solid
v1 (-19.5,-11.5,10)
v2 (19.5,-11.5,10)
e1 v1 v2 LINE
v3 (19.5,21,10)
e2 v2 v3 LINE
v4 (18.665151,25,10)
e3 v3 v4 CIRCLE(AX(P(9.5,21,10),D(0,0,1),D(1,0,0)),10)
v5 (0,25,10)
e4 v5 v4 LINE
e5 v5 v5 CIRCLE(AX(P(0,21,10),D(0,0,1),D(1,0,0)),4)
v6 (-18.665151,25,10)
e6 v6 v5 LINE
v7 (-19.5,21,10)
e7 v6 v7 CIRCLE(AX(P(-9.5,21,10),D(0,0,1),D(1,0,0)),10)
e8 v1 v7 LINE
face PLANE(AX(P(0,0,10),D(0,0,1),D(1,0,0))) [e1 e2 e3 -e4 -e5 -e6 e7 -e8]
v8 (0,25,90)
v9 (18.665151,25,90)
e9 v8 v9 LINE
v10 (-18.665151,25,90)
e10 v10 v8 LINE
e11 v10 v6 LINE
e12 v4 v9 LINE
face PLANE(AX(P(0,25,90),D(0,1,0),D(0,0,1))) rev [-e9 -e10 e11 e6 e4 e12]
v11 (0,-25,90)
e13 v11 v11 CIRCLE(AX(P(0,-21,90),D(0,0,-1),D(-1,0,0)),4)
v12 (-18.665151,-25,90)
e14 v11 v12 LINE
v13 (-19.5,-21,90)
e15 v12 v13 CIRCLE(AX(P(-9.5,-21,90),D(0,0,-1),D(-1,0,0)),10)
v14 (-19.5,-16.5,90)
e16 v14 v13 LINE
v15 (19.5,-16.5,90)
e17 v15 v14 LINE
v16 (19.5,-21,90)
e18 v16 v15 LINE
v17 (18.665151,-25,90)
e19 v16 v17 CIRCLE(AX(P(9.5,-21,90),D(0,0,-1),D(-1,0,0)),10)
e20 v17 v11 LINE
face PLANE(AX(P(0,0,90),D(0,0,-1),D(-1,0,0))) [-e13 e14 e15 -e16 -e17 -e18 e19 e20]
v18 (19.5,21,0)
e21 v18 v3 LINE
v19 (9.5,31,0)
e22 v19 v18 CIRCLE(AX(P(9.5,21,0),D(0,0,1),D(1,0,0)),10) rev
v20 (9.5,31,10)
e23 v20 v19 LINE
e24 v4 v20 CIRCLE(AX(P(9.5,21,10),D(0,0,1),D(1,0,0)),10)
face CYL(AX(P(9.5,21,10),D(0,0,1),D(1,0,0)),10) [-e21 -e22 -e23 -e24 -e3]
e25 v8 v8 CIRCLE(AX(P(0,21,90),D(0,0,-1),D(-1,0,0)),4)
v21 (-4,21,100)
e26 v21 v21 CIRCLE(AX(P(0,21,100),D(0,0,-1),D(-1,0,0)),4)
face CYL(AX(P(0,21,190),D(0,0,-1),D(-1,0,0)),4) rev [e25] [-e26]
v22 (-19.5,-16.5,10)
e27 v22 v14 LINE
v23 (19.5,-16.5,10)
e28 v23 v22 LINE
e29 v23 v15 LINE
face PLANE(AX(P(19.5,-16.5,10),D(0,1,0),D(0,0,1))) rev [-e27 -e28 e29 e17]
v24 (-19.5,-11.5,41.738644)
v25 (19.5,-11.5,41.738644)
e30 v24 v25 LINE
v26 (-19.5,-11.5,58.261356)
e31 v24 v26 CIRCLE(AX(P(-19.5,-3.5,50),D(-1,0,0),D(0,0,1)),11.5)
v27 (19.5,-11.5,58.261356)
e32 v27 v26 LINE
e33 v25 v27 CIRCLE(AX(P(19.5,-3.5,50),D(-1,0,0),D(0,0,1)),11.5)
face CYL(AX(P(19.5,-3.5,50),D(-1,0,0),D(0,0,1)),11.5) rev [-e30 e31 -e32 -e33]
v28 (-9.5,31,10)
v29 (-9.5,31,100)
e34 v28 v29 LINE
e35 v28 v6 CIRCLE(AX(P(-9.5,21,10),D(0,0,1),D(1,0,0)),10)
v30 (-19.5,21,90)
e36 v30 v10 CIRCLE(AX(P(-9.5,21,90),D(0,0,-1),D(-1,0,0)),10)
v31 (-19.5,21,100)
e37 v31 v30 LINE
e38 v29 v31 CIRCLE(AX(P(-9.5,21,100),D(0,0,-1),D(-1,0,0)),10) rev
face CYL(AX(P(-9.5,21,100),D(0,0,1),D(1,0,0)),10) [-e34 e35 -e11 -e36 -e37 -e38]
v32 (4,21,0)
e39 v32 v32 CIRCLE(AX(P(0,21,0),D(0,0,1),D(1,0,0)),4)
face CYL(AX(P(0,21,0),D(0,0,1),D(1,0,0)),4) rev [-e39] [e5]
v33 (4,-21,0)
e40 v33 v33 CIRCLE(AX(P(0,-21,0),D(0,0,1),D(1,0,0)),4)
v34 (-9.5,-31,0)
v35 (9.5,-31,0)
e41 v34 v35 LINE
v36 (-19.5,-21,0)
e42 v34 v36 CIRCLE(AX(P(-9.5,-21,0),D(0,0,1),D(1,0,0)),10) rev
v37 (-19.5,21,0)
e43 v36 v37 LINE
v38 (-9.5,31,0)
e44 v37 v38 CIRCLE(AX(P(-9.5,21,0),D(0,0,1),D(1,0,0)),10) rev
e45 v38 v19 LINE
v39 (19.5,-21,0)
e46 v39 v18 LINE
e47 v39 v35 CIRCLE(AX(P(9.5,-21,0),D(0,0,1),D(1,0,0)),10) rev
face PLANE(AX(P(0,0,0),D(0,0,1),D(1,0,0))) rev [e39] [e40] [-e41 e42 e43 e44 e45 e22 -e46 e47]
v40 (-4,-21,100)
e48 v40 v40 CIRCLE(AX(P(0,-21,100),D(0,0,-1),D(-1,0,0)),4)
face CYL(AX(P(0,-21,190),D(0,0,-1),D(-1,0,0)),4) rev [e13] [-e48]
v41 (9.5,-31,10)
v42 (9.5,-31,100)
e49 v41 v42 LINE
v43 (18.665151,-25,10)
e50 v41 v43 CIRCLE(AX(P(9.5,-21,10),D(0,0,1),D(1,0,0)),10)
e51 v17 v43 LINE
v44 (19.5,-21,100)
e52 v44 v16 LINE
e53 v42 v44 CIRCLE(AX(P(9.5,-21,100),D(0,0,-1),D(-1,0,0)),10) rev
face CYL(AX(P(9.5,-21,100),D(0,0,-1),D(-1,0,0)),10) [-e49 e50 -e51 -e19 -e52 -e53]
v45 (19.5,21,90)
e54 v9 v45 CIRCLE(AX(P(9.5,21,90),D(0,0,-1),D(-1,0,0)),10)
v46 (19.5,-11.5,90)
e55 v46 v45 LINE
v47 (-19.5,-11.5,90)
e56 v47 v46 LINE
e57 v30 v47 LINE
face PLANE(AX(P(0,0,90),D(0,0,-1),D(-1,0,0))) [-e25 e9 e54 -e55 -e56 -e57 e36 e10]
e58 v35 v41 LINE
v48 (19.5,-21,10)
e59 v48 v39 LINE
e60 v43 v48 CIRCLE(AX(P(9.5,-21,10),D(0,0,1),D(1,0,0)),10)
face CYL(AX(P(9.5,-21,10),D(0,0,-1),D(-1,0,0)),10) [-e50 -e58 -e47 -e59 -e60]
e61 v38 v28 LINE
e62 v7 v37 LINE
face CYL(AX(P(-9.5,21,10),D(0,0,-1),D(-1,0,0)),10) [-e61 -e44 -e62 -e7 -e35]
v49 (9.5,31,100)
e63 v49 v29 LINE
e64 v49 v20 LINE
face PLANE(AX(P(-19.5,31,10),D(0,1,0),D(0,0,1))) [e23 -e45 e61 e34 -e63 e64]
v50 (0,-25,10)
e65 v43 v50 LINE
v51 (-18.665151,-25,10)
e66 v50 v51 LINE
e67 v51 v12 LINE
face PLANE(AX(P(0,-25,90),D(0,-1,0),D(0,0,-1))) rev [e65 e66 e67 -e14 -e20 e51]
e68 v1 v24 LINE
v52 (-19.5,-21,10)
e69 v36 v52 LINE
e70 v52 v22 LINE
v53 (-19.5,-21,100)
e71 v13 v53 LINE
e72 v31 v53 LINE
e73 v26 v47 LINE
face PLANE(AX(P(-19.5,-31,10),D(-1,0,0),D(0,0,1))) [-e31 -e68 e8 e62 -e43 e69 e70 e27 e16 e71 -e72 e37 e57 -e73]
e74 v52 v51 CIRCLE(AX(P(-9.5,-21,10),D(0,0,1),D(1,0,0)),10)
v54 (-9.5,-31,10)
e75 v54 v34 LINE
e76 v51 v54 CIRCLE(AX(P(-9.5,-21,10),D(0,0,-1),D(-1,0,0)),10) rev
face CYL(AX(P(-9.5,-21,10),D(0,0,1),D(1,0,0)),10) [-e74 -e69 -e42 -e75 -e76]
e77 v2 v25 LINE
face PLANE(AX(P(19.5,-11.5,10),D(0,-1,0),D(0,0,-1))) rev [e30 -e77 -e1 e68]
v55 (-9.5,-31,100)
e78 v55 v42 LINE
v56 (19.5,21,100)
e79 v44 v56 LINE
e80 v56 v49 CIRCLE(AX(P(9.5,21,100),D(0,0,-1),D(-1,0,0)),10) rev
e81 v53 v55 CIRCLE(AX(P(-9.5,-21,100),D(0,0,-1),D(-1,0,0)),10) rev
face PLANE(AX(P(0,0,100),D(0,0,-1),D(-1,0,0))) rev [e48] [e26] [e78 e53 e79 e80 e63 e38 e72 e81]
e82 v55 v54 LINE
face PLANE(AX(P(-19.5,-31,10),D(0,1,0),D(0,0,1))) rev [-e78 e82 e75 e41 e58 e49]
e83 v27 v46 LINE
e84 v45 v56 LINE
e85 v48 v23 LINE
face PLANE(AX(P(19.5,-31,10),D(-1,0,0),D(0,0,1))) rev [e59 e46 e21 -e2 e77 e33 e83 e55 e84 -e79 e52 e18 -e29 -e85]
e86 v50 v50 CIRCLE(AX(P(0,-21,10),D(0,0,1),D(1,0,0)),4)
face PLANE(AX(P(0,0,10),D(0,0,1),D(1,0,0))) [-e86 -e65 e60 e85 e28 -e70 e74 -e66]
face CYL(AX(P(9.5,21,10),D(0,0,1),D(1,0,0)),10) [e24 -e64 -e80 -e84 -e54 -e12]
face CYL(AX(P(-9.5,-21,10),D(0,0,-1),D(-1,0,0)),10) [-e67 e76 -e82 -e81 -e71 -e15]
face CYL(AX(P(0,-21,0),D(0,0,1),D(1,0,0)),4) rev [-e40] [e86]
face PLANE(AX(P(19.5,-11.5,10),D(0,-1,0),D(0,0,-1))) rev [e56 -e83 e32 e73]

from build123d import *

# Parameters (mm, degrees)
ESQUISSE1_W             = 39
ESQUISSE1_H             = 62
BOSS_EXTRU_1_DEPTH      = 10
ESQUISSE2_R             = 4
ENL_V_MAT_EXTRU_1_DEPTH = 10
CONG_1_R                = 10
BOSS_EXTRU_2_DEPTH      = 80
CONG_2_R                = 10
ESQUISSE4_W             = 39
ESQUISSE4_H             = 62
BOSS_EXTRU_3_DEPTH      = 10
CONG_3_START            = 10
CONG_3_DEPTH            = 91
ENL_V_START             = -100
ESQUISSE5_R             = 4
ENL_V_MAT_EXTRU_2_DEPTH = 100
ESQUISSE6_W             = 39
ESQUISSE6_H             = 5
BOSS_EXTRU_4_DEPTH      = 80
ESQUISSE7_R             = 11.5
ENL_V_MAT_EXTRU_3_DEPTH = 112.722871427


with BuildPart() as part:
    # Esquisse1 → Boss.-Extru.1 (new body)
    with BuildSketch(Plane.XY):
        Rectangle(ESQUISSE1_W, ESQUISSE1_H)
    extrude(amount=BOSS_EXTRU_1_DEPTH)

    # Esquisse2 → Enlèv. mat.-Extru.1 (cut)
    with BuildSketch(Plane.XY.offset(10)):
        with Locations((0, 21)):
            Circle(ESQUISSE2_R)
        with Locations((0, -21)):
            Circle(ESQUISSE2_R)
    extrude(amount=-ENL_V_MAT_EXTRU_1_DEPTH, mode=Mode.SUBTRACT)

    # Congé1
    cong_1_edges = [part.edges().sort_by_distance(p)[0] for p in [
        (-19.5, 31, 5),
        (-19.5, -31, 5),
        (19.5, -31, 5),
        (19.5, 31, 5),
    ]]
    fillet(cong_1_edges, radius=CONG_1_R)

    # Esquisse3 → Boss.-Extru.2 (add)
    with BuildSketch(Plane.XY.offset(10)):
        Polygon((0, 25), (19.5, 25), (19.5, 31), (-19.5, 31), (-19.5, 25), align=None)
        Polygon((0, -25), (19.5, -25), (19.5, -31), (-19.5, -31), (-19.5, -25), align=None)
    extrude(amount=BOSS_EXTRU_2_DEPTH)

    # Congé2
    # the kernel refuses this fillet: 10 mm, written as the material it takes off along each edge
    with BuildSketch(Plane(origin=(-19.5, 31, -12.912878475), x_dir=(1, 0, 0), z_dir=(0, 0, 1)), Plane(origin=(19.5, -31, -12.912878475), x_dir=(-1, 0, 0), z_dir=(0, 0, 1))) as cong_2_piece_1:
        with BuildLine():
            CenterArc((9.16515139, -10), CONG_2_R, 90, 66.421821522)
            Line((0, -6), (-0.183303028, -5.92))
            ThreePointArc((-0.183303028, -5.92), (-0.2, -3), (-0.2, 0))
            Line((-0.2, 0), (0, 0.2))
            Line((0, 0.2), (9.16515139, 0.2))
            Line((9.16515139, 0.2), (9.16515139, 0))
        make_face()
    extrude(amount=125.82575695, mode=Mode.SUBTRACT)
    with BuildSketch(Plane(origin=(19.5, 31, -12.912878475), x_dir=(-1, 0, 0), z_dir=(0, 0, 1)), Plane(origin=(-19.5, -31, -12.912878475), x_dir=(1, 0, 0), z_dir=(0, 0, 1))) as cong_2_piece_2:
        with BuildLine():
            CenterArc((9.16515139, 10), CONG_2_R, 203.578178478, 66.421821522)
            Line((0, 6), (-0.183303028, 5.92))
            ThreePointArc((-0.183303028, 5.92), (-0.2, 3), (-0.2, 0))
            Line((-0.2, 0), (0, -0.2))
            Line((0, -0.2), (9.16515139, -0.2))
            Line((9.16515139, -0.2), (9.16515139, 0))
        make_face()
    extrude(amount=125.82575695, mode=Mode.SUBTRACT)

    # Esquisse4 → Boss.-Extru.3 (add)
    with BuildSketch(Plane.XY.offset(90)):
        Rectangle(ESQUISSE4_W, ESQUISSE4_H)
    extrude(amount=BOSS_EXTRU_3_DEPTH)

    # Congé3: read off the stored shape, not the designer's step
    # Congé3 outline → Congé3 (cut)
    with BuildSketch(Plane.XY.offset(CONG_3_START)):
        with BuildLine():
            ThreePointArc((-9.5, -31), (-16.571067812, -28.071067812), (-19.5, -21))
            Line((-19.5, -21), (-19.5, -31))
            Line((-19.5, -31), (-9.5, -31))
        make_face()
        with BuildLine():
            ThreePointArc((19.5, -21), (16.571067812, -28.071067812), (9.5, -31))
            Line((9.5, -31), (19.5, -31))
            Line((19.5, -31), (19.5, -21))
        make_face()
        with BuildLine():
            ThreePointArc((-19.5, 21), (-16.571067812, 28.071067812), (-9.5, 31))
            Line((-9.5, 31), (-19.5, 31))
            Line((-19.5, 31), (-19.5, 21))
        make_face()
        with BuildLine():
            ThreePointArc((9.5, 31), (16.571067812, 28.071067812), (19.5, 21))
            Line((19.5, 21), (19.5, 31))
            Line((19.5, 31), (9.5, 31))
        make_face()
    extrude(amount=CONG_3_DEPTH, mode=Mode.SUBTRACT)

    # Esquisse5 → Enlèv. mat.-Extru.2 (cut)
    with BuildSketch(Plane(origin=(0, 0, 90), x_dir=(-1, 0, 0), z_dir=(0, 0, -1)).offset(ENL_V_START)):
        with Locations(Location((0, 21, 0), (0, 0, 180))):
            Circle(ESQUISSE5_R)
        with Locations(Location((0, -21, 0), (0, 0, 180))):
            Circle(ESQUISSE5_R)
    extrude(amount=ENL_V_MAT_EXTRU_2_DEPTH, mode=Mode.SUBTRACT)

    # Esquisse6 → Boss.-Extru.4 (add)
    with BuildSketch(Plane(origin=(0, 0, 90), x_dir=(-1, 0, 0), z_dir=(0, 0, -1))):
        with Locations((0, -14)):
            Rectangle(ESQUISSE6_W, ESQUISSE6_H)
    extrude(amount=BOSS_EXTRU_4_DEPTH)

    # Esquisse7 → Enlèv. mat.-Extru.3 (cut, through all)
    with BuildSketch(Plane.ZY.offset(19.5)):
        with Locations((50, -3.5)):
            Circle(ESQUISSE7_R)
    extrude(amount=-ENL_V_MAT_EXTRU_3_DEPTH, mode=Mode.SUBTRACT)


solid = part.part
